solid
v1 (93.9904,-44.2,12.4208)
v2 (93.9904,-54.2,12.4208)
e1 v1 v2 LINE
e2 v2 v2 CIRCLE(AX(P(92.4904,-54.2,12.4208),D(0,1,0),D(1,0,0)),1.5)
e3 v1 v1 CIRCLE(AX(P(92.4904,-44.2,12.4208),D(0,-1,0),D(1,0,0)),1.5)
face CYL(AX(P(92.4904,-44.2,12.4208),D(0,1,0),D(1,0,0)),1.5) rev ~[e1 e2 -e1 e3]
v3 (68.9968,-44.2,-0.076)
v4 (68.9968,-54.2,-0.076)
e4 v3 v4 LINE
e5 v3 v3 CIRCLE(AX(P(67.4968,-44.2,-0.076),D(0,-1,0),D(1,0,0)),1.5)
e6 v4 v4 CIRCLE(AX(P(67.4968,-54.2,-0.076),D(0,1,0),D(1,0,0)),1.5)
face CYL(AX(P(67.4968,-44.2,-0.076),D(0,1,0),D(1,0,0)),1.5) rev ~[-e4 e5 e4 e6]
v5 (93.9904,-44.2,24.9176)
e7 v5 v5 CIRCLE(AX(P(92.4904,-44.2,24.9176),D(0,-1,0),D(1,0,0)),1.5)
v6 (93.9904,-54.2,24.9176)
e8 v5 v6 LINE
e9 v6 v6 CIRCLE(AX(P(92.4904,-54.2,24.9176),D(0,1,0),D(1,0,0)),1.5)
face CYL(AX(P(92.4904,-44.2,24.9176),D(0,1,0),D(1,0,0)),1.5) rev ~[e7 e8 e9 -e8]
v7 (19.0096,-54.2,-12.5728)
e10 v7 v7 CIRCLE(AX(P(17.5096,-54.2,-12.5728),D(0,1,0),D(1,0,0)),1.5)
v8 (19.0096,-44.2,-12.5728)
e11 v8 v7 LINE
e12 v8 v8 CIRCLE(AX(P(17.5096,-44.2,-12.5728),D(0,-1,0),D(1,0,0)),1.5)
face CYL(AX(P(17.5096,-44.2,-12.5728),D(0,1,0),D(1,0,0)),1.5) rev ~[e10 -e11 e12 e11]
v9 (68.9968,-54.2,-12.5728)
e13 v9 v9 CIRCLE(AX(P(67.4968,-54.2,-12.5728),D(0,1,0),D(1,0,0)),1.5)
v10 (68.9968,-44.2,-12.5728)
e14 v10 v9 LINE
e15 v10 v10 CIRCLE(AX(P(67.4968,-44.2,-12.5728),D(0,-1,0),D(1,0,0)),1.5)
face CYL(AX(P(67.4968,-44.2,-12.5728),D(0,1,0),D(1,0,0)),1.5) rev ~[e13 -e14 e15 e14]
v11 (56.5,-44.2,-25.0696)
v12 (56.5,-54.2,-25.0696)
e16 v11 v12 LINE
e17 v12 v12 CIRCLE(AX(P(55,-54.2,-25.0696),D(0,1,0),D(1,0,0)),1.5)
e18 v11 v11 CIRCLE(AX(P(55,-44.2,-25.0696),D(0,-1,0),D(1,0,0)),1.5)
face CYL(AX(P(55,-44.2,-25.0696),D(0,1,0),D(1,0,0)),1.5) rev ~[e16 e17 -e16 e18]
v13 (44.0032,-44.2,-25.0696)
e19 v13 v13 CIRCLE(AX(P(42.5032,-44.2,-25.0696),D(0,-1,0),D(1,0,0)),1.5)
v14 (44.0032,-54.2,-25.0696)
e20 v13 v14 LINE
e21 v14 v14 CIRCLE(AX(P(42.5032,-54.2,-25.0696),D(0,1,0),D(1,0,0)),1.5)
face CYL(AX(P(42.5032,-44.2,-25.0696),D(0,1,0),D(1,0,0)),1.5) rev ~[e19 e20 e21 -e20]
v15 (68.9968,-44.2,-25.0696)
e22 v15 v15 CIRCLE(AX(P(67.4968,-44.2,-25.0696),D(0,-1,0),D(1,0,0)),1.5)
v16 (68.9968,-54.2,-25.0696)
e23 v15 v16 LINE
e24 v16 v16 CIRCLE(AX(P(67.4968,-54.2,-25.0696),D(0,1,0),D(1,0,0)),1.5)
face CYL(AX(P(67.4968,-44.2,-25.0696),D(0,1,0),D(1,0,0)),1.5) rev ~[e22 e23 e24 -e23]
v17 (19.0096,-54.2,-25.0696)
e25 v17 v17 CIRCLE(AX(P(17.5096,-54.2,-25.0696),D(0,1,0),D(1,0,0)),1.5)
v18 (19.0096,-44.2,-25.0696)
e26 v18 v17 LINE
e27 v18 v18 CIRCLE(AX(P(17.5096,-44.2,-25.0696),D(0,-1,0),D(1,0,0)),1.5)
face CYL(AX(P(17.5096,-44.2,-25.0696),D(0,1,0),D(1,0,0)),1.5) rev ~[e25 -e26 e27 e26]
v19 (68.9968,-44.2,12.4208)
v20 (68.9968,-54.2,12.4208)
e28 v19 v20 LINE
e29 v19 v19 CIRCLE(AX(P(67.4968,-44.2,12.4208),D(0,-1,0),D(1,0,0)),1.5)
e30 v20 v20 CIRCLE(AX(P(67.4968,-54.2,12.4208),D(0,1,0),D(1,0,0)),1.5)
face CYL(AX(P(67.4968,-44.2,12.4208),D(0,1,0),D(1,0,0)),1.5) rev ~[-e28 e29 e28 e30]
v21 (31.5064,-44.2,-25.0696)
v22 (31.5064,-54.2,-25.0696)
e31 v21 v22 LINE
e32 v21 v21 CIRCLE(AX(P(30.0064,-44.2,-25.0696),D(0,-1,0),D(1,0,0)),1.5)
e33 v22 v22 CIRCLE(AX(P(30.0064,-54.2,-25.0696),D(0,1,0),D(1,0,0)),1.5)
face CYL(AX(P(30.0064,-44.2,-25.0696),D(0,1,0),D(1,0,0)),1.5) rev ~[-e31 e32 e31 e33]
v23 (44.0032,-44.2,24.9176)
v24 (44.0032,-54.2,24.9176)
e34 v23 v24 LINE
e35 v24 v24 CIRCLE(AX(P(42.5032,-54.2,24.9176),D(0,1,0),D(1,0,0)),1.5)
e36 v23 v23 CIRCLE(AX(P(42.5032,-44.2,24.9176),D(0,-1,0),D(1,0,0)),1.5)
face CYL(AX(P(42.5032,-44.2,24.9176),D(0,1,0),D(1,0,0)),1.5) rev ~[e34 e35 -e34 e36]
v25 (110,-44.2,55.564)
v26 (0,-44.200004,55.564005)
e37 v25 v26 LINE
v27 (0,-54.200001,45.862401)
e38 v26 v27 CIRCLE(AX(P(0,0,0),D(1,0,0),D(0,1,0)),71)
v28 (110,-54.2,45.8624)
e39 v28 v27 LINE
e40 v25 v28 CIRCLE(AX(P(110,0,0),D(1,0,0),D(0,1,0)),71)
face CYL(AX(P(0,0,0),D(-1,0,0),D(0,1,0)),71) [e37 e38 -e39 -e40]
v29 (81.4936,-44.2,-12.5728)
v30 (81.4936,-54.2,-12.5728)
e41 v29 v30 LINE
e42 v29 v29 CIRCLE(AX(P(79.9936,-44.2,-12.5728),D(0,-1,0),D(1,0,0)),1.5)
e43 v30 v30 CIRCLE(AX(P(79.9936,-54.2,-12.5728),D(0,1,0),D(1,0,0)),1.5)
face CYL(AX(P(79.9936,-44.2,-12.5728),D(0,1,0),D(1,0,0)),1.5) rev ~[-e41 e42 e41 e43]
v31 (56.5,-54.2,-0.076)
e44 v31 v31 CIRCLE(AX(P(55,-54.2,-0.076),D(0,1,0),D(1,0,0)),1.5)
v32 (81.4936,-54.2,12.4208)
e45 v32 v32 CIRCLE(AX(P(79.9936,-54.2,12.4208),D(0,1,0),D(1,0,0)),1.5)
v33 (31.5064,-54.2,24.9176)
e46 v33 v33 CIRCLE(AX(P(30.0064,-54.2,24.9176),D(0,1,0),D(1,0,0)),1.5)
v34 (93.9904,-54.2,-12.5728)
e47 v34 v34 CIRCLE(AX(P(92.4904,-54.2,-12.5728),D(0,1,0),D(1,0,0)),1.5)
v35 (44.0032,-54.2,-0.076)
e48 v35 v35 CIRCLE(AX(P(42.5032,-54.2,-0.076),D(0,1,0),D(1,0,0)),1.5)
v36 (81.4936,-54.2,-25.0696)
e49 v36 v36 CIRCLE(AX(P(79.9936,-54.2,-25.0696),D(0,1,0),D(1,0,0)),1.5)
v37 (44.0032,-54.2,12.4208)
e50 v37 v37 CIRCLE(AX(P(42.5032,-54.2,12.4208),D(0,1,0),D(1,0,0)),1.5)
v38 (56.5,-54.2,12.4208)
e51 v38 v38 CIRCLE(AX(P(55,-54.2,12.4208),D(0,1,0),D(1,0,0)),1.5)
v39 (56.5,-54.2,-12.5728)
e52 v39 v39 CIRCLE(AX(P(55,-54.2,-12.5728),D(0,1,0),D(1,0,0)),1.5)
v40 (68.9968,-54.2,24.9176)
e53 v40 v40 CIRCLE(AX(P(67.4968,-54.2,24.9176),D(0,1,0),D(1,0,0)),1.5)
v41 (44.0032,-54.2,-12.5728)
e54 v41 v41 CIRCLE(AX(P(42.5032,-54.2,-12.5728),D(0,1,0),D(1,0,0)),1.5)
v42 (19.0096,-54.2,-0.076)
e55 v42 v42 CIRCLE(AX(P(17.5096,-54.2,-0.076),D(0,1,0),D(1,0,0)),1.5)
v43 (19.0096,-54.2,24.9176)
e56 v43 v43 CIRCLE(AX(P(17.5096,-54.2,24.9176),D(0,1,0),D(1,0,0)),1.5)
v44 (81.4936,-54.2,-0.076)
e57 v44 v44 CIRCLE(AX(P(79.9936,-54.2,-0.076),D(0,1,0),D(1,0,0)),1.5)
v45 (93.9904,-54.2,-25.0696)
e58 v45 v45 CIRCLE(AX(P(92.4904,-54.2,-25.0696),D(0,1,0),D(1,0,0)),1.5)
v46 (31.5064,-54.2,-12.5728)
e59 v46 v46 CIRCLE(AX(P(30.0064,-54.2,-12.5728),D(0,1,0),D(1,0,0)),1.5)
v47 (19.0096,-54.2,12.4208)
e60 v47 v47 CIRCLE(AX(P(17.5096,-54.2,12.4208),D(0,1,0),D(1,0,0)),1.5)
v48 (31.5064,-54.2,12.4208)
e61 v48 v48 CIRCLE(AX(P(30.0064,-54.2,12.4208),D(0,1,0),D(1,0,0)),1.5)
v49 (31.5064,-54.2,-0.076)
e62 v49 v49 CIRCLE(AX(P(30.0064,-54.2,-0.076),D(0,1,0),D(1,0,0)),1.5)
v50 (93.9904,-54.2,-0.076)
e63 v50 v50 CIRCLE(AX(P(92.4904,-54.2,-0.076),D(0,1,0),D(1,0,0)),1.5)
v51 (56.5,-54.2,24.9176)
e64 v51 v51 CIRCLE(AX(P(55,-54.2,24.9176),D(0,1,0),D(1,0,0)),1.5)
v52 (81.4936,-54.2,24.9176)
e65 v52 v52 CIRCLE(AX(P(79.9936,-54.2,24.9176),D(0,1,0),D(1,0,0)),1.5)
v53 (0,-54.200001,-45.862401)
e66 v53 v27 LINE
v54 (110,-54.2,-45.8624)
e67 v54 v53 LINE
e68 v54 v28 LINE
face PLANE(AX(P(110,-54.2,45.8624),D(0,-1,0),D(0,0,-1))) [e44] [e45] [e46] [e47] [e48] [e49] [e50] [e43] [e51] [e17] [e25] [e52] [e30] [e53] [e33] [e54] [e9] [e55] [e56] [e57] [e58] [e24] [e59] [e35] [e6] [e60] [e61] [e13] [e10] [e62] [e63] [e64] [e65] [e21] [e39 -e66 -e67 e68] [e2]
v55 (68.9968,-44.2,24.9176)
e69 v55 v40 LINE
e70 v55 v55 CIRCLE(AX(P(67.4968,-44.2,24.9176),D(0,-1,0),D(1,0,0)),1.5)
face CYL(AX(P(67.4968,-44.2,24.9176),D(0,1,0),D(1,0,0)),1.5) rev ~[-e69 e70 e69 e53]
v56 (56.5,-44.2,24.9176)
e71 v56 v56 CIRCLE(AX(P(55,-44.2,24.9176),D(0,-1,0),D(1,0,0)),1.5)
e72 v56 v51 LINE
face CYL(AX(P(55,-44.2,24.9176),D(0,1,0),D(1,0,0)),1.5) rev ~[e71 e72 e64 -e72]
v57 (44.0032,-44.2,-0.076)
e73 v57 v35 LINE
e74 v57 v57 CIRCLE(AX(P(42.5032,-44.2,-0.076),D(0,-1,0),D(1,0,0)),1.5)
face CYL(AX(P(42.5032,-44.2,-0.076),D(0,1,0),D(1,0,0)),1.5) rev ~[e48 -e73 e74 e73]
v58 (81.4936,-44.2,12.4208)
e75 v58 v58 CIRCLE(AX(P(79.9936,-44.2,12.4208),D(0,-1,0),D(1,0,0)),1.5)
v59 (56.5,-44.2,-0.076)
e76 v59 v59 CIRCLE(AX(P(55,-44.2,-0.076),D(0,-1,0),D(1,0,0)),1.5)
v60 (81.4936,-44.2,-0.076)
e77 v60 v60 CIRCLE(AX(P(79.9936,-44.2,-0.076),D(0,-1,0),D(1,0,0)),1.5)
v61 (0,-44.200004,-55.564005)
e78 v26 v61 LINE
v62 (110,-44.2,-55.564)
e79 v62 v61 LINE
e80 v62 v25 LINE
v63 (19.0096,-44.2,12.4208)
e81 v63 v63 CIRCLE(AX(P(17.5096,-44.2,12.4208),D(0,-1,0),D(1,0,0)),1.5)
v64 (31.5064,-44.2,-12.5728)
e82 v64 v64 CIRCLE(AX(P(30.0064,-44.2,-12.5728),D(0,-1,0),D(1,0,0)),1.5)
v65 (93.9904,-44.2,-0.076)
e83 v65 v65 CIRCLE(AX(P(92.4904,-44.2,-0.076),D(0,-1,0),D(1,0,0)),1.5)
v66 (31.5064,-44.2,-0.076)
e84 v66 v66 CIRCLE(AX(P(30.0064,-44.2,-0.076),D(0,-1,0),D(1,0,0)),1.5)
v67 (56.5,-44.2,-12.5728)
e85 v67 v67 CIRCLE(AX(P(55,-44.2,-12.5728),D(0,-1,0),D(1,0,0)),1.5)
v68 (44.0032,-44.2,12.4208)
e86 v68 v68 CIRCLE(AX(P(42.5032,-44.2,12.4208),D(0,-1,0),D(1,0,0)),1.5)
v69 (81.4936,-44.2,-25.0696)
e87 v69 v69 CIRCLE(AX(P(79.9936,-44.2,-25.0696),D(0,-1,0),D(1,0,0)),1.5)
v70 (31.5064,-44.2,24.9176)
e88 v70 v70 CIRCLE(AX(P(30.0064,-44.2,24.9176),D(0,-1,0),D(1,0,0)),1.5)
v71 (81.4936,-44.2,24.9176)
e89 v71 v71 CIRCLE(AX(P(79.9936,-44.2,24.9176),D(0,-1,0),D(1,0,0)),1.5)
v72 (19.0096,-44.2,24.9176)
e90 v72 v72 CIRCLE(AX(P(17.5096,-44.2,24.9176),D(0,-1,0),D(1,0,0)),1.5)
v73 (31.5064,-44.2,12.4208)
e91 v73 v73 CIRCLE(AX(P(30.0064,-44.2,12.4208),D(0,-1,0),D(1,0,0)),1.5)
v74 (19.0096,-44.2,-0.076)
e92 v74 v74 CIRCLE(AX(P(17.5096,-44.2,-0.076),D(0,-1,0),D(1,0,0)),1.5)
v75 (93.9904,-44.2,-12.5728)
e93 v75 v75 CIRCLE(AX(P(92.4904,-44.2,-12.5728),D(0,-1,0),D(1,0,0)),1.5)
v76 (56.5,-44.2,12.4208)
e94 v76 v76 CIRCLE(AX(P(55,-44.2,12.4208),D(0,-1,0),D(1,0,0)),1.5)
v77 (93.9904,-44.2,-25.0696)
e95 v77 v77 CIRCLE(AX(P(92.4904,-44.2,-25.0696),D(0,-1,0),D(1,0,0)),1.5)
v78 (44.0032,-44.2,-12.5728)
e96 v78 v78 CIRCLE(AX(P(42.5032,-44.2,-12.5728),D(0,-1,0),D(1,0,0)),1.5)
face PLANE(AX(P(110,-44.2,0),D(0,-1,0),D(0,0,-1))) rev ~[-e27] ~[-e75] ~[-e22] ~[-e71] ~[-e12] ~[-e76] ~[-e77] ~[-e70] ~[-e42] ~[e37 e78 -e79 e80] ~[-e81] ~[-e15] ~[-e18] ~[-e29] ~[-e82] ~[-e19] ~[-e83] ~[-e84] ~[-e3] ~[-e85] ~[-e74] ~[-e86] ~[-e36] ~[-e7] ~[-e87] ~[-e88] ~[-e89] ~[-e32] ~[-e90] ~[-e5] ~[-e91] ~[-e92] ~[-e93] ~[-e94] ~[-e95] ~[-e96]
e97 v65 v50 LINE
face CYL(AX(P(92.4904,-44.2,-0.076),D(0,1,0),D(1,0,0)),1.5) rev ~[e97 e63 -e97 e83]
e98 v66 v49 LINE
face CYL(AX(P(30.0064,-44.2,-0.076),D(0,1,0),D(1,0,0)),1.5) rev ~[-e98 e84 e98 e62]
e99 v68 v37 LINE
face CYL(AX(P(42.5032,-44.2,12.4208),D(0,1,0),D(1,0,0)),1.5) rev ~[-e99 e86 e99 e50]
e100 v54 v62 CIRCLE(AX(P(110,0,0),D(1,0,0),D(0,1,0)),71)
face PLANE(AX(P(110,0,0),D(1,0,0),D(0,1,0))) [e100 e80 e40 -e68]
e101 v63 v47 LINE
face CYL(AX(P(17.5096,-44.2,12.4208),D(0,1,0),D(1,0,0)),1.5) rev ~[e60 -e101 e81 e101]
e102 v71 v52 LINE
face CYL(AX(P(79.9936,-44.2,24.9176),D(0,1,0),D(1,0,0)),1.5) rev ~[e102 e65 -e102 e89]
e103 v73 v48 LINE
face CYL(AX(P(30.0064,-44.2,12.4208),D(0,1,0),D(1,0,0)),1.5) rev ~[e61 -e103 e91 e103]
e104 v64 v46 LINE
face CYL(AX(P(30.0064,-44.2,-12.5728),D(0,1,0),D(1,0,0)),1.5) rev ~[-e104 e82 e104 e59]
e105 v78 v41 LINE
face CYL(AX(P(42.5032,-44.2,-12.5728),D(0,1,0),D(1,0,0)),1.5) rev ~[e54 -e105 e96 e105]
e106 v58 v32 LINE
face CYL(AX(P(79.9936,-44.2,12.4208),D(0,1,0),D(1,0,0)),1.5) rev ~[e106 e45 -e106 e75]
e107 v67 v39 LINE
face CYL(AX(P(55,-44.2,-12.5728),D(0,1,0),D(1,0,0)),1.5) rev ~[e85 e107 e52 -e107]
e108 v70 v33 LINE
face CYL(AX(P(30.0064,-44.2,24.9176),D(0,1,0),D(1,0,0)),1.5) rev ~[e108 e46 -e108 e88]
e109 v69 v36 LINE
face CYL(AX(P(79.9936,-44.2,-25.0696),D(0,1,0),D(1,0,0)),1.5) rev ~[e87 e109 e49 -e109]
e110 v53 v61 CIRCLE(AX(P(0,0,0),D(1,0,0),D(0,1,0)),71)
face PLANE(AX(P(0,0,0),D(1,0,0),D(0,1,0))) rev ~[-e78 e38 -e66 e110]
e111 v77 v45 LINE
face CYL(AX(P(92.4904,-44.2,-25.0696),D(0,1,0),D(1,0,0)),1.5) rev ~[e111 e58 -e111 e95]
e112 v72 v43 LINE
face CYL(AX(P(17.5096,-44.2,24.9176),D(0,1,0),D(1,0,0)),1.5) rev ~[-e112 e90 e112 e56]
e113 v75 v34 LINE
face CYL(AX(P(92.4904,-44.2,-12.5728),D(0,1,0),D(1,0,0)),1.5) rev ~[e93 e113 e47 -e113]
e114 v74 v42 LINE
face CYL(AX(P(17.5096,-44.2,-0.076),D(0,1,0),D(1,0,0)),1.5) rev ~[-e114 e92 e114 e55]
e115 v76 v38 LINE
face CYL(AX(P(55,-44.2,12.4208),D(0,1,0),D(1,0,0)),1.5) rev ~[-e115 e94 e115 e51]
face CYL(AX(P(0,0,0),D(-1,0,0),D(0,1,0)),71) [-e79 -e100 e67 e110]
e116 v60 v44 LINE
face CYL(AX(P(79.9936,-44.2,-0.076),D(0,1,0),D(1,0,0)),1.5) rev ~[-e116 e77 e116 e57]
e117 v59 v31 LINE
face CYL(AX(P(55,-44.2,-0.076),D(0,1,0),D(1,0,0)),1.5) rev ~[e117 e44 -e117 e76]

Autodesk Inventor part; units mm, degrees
ref_plane "YZ Plane" through (0, 0, 0) normal (1, 0, 0) x (0, 1, 0)
ref_plane "XZ Plane" through (0, 0, 0) normal (0, 1, 0) x (-1, 0, 0)
ref_plane "XY Plane" through (0, 0, 0) normal (0, 0, 1) x (1, 0, 0)
sketch "Sketch1" plane through (0, 0, 0) normal (1, 0, 0) x (0, 1, 0)
  circle A0 centre (0, 0) radius 71
  dimension "d0" = 142
extrude "Extrusion1" add sketch "Sketch1" along normal blind 110
sketch "Sketch2" plane through (110, 0, 0) normal (1, 0, 0) x (0, 0, -1)
  line L0 (0, 0) -> (0, -44.2)
  circle A0 centre (0, 0) radius 71 projected
  line L1 (-55.564, -44.2) -> (55.564, -44.2)
  dimension "d3" = 44.2
extrude "Extrusion2" cut sketch "Sketch2" against normal blind 150 contours A0 L1 picked at (-0.2063, 32.437)
sketch "Sketch3" plane through (110, 0, 0) normal (1, 0, 0) x (0, 0, -1)
  line L0 (0, 0) -> (0, -54.2)
  arc A0 (-55.564, -44.2) -> (55.564, -44.2) centre (0, 0) ccw projected
  line L1 (-45.8624, -54.2) -> (45.8624, -54.2)
  dimension "d6" = 54.2
extrude "Extrusion3" cut sketch "Sketch3" against normal blind 150
sketch "Sketch7" plane through (110, -44.2, 55.564) normal (0, 1, 0) x (1, 0, 0)
  line L0 (-110, 0) -> (-110, 9.7016) projected
  line L1 (-110, 0) -> (-55, 0)
  line L2 (0, 0) -> (-110, 0) projected
  line L3 (-110, 111.128) -> (0, 111.128) projected
  line L4 (-55, 0) -> (-55, 55.64)
  circle A0 centre (-55, 55.64) radius 1.5
  point P0 (-110, 55.564)
  dimension "d71" = 55
  dimension "d72" = 111.128
  dimension "d73" = 55.64
  dimension "d75" = 3
extrude "Extrusion5" cut sketch "Sketch7" against normal blind 10
pattern_linear "Rectangular Pattern1" count 7 spacing 12.4968 along (-1, 0, 0) count 5 spacing 12.4968 along (0, 0, -1) of "Extrusion2", "Extrusion5" first direction both ways yes second direction both ways yes
properties part number "Base"
